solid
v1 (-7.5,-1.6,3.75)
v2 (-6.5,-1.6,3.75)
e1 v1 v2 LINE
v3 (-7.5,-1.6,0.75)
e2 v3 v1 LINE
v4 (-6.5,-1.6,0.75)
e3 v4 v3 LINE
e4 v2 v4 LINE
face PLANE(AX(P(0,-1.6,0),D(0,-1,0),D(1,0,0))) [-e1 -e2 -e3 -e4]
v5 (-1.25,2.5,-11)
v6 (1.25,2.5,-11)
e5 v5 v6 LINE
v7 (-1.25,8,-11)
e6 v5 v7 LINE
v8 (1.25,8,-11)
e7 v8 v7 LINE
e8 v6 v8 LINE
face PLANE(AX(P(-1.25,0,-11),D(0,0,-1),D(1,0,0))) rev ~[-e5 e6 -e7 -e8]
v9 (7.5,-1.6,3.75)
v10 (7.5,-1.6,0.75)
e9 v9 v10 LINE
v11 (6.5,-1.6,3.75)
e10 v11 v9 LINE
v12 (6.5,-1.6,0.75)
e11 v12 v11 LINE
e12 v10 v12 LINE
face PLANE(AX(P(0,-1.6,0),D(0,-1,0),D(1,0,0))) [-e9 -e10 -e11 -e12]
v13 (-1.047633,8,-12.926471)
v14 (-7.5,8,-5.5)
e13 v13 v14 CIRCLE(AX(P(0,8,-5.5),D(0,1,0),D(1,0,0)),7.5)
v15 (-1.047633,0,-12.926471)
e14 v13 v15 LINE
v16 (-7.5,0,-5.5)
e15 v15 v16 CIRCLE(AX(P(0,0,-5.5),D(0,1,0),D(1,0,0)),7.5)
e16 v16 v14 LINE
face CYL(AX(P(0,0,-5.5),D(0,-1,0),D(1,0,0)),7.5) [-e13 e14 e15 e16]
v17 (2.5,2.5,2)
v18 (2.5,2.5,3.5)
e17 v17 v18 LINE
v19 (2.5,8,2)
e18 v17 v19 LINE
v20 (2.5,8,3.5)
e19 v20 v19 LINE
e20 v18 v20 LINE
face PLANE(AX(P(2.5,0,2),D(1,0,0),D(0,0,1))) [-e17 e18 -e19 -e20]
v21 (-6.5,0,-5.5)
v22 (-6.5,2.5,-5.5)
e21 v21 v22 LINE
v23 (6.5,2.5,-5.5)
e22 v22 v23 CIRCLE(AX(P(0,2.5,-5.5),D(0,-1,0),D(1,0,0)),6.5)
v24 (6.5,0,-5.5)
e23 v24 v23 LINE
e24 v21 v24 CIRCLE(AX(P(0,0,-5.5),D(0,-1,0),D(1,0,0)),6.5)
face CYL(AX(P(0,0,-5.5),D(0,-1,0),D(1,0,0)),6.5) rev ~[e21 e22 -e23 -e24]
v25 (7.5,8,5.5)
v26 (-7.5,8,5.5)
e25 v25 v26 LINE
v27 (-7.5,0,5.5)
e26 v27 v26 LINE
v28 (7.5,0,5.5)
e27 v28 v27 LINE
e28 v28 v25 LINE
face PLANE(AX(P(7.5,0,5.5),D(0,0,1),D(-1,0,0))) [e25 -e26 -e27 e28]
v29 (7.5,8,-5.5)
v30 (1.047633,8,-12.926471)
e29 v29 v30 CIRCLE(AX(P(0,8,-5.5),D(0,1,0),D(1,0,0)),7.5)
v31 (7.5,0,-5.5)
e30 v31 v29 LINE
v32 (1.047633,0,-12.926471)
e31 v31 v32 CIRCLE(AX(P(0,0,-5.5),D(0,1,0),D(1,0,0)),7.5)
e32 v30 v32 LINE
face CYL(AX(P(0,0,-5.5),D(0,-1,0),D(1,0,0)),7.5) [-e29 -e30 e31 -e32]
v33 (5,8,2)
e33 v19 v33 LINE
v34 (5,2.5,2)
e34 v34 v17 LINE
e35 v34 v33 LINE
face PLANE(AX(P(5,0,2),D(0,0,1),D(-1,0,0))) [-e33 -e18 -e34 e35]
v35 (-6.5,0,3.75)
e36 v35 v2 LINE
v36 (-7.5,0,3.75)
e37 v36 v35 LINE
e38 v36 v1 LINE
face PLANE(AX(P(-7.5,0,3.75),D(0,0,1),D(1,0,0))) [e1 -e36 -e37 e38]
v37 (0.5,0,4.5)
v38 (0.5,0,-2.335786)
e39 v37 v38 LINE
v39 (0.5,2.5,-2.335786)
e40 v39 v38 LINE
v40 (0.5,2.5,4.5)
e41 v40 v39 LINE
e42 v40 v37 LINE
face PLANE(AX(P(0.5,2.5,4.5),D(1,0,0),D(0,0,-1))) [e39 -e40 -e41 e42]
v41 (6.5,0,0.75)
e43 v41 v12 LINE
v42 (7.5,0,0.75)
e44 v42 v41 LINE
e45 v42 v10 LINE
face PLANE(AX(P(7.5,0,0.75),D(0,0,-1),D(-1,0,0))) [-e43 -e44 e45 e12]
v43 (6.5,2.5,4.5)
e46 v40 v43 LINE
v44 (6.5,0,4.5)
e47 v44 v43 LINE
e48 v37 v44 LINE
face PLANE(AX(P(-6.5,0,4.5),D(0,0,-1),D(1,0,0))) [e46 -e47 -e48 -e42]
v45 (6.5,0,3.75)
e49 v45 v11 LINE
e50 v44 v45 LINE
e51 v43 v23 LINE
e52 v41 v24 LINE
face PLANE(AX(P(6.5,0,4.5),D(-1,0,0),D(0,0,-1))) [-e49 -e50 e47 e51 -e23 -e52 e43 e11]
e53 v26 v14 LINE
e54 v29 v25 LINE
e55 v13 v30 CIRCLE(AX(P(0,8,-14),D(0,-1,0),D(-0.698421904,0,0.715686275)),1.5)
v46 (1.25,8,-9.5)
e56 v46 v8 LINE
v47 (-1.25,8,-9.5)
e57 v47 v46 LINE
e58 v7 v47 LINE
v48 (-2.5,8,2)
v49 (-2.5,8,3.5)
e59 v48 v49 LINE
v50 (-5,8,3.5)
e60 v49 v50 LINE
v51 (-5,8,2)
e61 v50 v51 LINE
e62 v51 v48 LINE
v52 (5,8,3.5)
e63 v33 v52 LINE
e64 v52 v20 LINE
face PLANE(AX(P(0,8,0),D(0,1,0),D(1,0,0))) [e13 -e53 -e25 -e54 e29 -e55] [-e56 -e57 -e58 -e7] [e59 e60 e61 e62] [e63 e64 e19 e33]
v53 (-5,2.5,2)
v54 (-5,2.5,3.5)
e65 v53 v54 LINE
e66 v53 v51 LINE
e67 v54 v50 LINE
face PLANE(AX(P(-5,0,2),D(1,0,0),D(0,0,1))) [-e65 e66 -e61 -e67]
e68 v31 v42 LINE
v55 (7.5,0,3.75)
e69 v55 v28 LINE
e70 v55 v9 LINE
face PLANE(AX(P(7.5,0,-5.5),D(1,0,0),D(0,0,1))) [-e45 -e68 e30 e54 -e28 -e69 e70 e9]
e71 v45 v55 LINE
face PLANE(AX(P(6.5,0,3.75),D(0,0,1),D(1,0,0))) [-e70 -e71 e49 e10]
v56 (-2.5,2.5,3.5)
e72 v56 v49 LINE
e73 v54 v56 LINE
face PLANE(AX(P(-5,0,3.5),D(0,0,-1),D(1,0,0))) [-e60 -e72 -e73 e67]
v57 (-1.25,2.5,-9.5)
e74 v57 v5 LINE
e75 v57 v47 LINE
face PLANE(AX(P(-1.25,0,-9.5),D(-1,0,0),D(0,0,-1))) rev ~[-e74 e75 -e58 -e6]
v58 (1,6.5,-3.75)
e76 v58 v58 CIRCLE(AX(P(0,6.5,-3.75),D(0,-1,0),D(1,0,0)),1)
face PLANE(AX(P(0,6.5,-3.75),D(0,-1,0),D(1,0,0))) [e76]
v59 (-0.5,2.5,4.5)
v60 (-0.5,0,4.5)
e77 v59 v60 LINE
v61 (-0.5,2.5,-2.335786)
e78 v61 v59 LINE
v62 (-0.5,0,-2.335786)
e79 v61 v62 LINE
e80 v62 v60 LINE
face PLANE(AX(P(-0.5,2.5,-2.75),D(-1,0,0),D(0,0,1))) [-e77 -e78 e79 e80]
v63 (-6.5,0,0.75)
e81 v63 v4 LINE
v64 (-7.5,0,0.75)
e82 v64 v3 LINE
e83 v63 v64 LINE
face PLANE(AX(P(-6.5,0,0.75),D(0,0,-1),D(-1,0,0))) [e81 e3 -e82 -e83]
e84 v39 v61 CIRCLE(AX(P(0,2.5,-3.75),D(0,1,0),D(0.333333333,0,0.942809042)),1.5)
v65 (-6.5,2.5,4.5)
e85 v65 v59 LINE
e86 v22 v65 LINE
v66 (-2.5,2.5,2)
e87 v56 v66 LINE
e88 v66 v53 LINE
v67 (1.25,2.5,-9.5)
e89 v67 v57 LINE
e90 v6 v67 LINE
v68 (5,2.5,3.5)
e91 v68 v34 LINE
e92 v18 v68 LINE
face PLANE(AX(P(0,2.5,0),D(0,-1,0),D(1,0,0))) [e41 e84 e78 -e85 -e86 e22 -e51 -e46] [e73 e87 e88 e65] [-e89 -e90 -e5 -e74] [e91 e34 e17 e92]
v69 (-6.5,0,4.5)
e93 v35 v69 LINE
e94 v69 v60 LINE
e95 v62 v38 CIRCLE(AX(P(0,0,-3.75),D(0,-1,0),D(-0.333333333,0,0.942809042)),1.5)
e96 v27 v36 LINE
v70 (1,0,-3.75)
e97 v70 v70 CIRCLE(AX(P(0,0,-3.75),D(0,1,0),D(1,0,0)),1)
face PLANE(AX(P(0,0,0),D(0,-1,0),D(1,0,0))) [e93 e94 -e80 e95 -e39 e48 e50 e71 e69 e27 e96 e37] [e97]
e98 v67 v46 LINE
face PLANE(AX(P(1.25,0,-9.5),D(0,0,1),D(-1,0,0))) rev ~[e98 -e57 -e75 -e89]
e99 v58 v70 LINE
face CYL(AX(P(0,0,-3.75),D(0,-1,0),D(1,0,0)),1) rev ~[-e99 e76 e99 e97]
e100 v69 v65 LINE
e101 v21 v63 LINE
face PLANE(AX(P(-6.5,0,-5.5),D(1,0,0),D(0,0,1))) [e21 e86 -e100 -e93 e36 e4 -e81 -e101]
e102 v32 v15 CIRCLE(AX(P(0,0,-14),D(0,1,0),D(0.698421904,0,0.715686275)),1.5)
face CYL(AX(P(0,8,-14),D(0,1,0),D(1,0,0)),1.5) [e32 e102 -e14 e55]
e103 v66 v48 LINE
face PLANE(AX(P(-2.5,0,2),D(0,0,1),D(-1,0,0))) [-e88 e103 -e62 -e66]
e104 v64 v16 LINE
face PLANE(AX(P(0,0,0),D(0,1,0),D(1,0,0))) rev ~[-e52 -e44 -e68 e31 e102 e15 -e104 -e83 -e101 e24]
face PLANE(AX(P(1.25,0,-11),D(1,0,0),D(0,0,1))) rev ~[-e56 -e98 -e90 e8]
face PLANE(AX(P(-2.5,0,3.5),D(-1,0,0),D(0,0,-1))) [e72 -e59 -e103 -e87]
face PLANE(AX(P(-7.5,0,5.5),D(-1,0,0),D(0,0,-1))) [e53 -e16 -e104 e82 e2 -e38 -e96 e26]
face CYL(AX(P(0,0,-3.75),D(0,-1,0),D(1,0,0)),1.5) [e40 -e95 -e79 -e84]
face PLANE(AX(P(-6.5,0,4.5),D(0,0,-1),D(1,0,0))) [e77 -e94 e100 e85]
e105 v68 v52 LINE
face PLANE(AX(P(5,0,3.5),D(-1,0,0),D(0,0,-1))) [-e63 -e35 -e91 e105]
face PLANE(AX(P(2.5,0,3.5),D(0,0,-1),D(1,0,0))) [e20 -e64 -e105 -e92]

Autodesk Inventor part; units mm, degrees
ref_plane "YZ Plane" through (0, 0, 0) normal (1, 0, 0) x (0, 1, 0)
ref_plane "XZ Plane" through (0, 0, 0) normal (0, 1, 0) x (-1, 0, 0)
ref_plane "XY Plane" through (0, 0, 0) normal (0, 0, 1) x (1, 0, 0)
sketch "Sketch1" plane through (0, 0, 0) normal (0, 1, 0) x (-1, 0, 0)
  line L0 (-7.5, 5.5) -> (7.5, 5.5)
  line L1 (7.5, 5.5) -> (7.5, -5.5)
  line L2 (7.5, -5.5) -> (-7.5, -5.5)
  line L3 (-7.5, -5.5) -> (-7.5, 5.5)
  line L4 (-7.5, 5.5) -> (7.5, -5.5) construction
  line L5 (7.5, 5.5) -> (-7.5, -5.5) construction
  circle A0 centre (0, -5.5) radius 7.5 construction
  arc A1 (-7.5, -5.5) -> (7.5, -5.5) centre (0, -5.5) ccw
  point P0 (0, 0)
  dimension "d0" = 11
  dimension "d1" = 15
extrude "Extrusion1" add sketch "Sketch1" along normal blind 8
sketch "Sketch2" plane through (0, 0, 0) normal (0, -1, 0) x (1, 0, 0)
  line L0 (7.5, 9.25) -> (-7.5, 9.25)
  line L1 (-7.5, 9.25) -> (-7.5, -20.75)
  line L2 (-7.5, -20.75) -> (7.5, -20.75)
  line L3 (7.5, -20.75) -> (7.5, 9.25)
  line L4 (7.5, 9.25) -> (-7.5, -20.75) construction
  line L5 (-7.5, 9.25) -> (7.5, -20.75) construction
  line L6 (-7.5, 5.5) -> (7.5, 5.5) projected
  line L7 (7, 8.75) -> (-7, 8.75) construction
  line L8 (-7, 8.75) -> (-7, -20.25) construction
  line L9 (-7, -20.25) -> (7, -20.25) construction
  line L10 (7, -20.25) -> (7, 8.75) construction
  line L11 (7, 8.75) -> (-7, -20.25) construction
  line L12 (-7, 8.75) -> (7, -20.25) construction
  point P0 (0, 0)
  point P1 (0, -5.75)
  dimension "d4" = 15
  dimension "d5" = 30
  dimension "d6" = 3.75
  dimension "d18" = 0.5
  dimension "d19" = 0.5
sketch "Sketch4" plane through (0, 0, 0) normal (0, -1, 0) x (1, 0, 0)
  line L0 (-7.5, -5.5) -> (-7.5, 5.5) projected
  line L1 (-7.5, 3.75) -> (-6.5, 3.75)
  line L2 (-6.5, 3.75) -> (-6.5, 0.75)
  line L3 (-6.5, 0.75) -> (-7.5, 0.75)
  line L4 (-7.5, 0.75) -> (-7.5, 3.75)
  line L5 (7.5, 5.5) -> (7.5, -5.5) projected
  line L6 (7.5, 0.75) -> (6.5, 0.75)
  line L7 (6.5, 0.75) -> (6.5, 3.75)
  line L8 (6.5, 3.75) -> (7.5, 3.75)
  line L9 (7.5, 3.75) -> (7.5, 0.75)
  line L10 (-7.5, -20.25) -> (7.5, -20.25) construction
  line L11 (7.5, -20.25) -> (7.5, 9.75) construction
  line L12 (7.5, 9.75) -> (-7.5, 9.75) construction
  line L13 (-7.5, 9.75) -> (-7.5, -20.25) construction
  line L14 (-7.5, -20.25) -> (7.5, 9.75) construction
  line L15 (7.5, -20.25) -> (-7.5, 9.75) construction
  line L16 (-7.5, 5.5) -> (7.5, 5.5) construction
  arc A0 (-7.5, -5.5) -> (7.5, -5.5) centre (0, -5.5) ccw construction
  point P0 (0, 0)
  point P1 (0, -5.25)
  point P2 (0, -13)
  point P3 (-7, 3.75)
  point P4 (-7.5, 0.75)
  point P5 (-7, 0.75)
  point P6 (7.5, 3.75)
  point P7 (-7.5, 0.75)
  dimension "d20" = 1
  dimension "d21" = 3
  dimension "d22" = 1
  dimension "d23" = 3
  dimension "d24" = 15
  dimension "d25" = 30
  dimension "d27" = 7.25
  dimension "d106" = 0.75
extrude "Extrusion3" add sketch "Sketch4" along normal blind 1.6
sketch "Sketch6" plane through (0, 0, 0) normal (0, -1, 0) x (1, 0, 0)
  line L0 (7.5, 11.25) -> (-7.5, 11.25)
  line L1 (-7.5, 11.25) -> (-7.5, -18.75)
  line L2 (-7.5, -18.75) -> (7.5, -18.75)
  line L3 (7.5, -18.75) -> (7.5, 11.25)
  line L4 (7.5, 11.25) -> (-7.5, -18.75) construction
  line L5 (-7.5, 11.25) -> (7.5, -18.75) construction
  line L6 (7, 10.75) -> (-7, 10.75) construction
  line L7 (-7, 10.75) -> (-7, -18.25) construction
  line L8 (-7, -18.25) -> (7, -18.25) construction
  line L9 (7, -18.25) -> (7, 10.75) construction
  line L10 (7, 10.75) -> (-7, -18.25) construction
  line L11 (-7, 10.75) -> (7, -18.25) construction
  circle A0 centre (0, -3.75) radius 1
  circle A1 centre (0, -3.75) radius 1.5
  line L12 (-6.5, 4.5) -> (6.5, 4.5)
  line L13 (6.5, 4.5) -> (6.5, -5.5)
  line L14 (6.5, -5.5) -> (-6.5, -5.5)
  line L15 (-6.5, -5.5) -> (-6.5, 4.5)
  line L16 (-7.5, 5.5) -> (7.5, 5.5) projected
  arc A2 (-7.5, -5.5) -> (7.5, -5.5) centre (0, -5.5) ccw projected
  circle A3 centre (0, -5.5) radius 6.5
  point P0 (0, 0)
  point P1 (-7.5, -3.75)
  point P2 (6.5, -5.5)
  dimension "d31" = 15
  dimension "d32" = 30
  dimension "d34" = 0.5
  dimension "d35" = 0.5
  dimension "d36" = 2
  dimension "d37" = 0.5
  dimension "d38" = 1
  dimension "d39" = 1
  dimension "d40" = 1
  dimension "d41" = 1
  dimension "d107" = 3.75
extrude "Extrusion4" cut sketch "Sketch6" against normal blind 2.5 contours A0 | L12 L13 A3 L15 | A3 L14 | L14 A3
sketch "Sketch10" plane through (0, 8, 0) normal (0, 1, 0) x (1, 0, 0)
  point P0 (0, 0)
sketch "Sketch11" plane through (0, 0, 0) normal (0, -1, 0) x (1, 0, 0)
  line L0 (-5, 3.5) -> (-2.5, 3.5)
  line L1 (-2.5, 3.5) -> (-2.5, 2)
  line L2 (-2.5, 2) -> (-5, 2)
  line L3 (-5, 2) -> (-5, 3.5)
  line L4 (2.5, 3.5) -> (5, 3.5)
  line L5 (5, 3.5) -> (5, 2)
  line L6 (5, 2) -> (2.5, 2)
  line L7 (2.5, 2) -> (2.5, 3.5)
  line L8 (-6.5, 3.75) -> (-7.5, 3.75) projected
  line L9 (-6.5, 0.75) -> (-6.5, 3.75) projected
  line L10 (6.5, 3.75) -> (6.5, 0.75) projected
  line L11 (-6.5, 4.5) -> (6.5, 4.5) projected
  line L12 (-1.25, -11) -> (1.25, -11)
  line L13 (1.25, -11) -> (1.25, -9.5)
  line L14 (1.25, -9.5) -> (-1.25, -9.5)
  line L15 (-1.25, -9.5) -> (-1.25, -11)
  circle A0 centre (0, -3.75) radius 1 projected
  point P0 (0, 0)
  point P1 (-3.75, 3.5)
  point P2 (3.75, 3.5)
  point P3 (1.25, -10.25)
  point P4 (2.5, 2.75)
  point P5 (0, -9.5)
  point P6 (3.75, 2)
  point P7 (-2.5, 2.75)
  dimension "d51" = 2.5
  dimension "d52" = 1.5
  dimension "d55" = 2.75
  dimension "d56" = 2.75
  dimension "d60" = 13
  dimension "d61" = 3.75
  dimension "d62" = 3.75
  dimension "d103" = 6.5
  dimension "d104" = 6.5
extrude "Extrusion8" cut sketch "Sketch11" against normal blind 10 contours L0 L1 L2 L3 | L4 L5 L6 L7 | L15 L14 L13 L12
sketch "Sketch12" plane through (0, 2.5, 0) normal (0, -1, 0) x (1, 0, 0)
  line L0 (5, 2) -> (5, 3.5) construction
  line L1 (2.5, 2) -> (5, 2) construction
  line L2 (5, 3.5) -> (2.5, 3.5) construction
  line L3 (2.5, 3.5) -> (2.5, 2) construction
  line L4 (2.5, 2) -> (5, 2) construction
  line L5 (5, 2) -> (5, 3.5) construction
  line L6 (-2.5, 2) -> (-2.5, 3.5) construction
  line L7 (-2.5, 2) -> (-5, 2) construction
  line L8 (-2.5, 3.5) -> (-5, 3.5) construction
  line L9 (-5, 3.5) -> (-5, 2) construction
  line L10 (-5, 2) -> (-2.5, 2) construction
  line L11 (-2.5, 2) -> (-2.5, 3.5) construction
  line L12 (-1.25, -9.5) -> (1.25, -9.5) construction
  line L13 (-1.25, -9.5) -> (-1.25, -11) construction
  line L14 (1.25, -9.5) -> (-1.25, -9.5) construction
  line L15 (-1.25, -9.5) -> (-1.25, -11) construction
  line L16 (-1.25, -11) -> (1.25, -11) construction
  line L17 (1.25, -11) -> (1.25, -9.5) construction
  line L18 (5.5, 3.5) -> (2, 3.5)
  line L19 (2, 3.5) -> (2, 2)
  line L20 (2, 2) -> (5.5, 2)
  line L21 (5.5, 2) -> (5.5, 3.5)
  line L22 (1.75, -9.5) -> (-1.75, -9.5)
  line L23 (-1.75, -9.5) -> (-1.75, -11)
  line L24 (-1.75, -11) -> (1.75, -11)
  line L25 (1.75, -11) -> (1.75, -9.5)
  line L26 (-2, 3.5) -> (-5.5, 3.5)
  line L27 (-5.5, 3.5) -> (-5.5, 2)
  line L28 (-5.5, 2) -> (-2, 2)
  line L29 (-2, 2) -> (-2, 3.5)
  point P0 (0, 0)
  point P1 (-2.5, 2.75)
  point P2 (-2, 2.75)
  point P3 (-3.75, 2)
  point P4 (-3.75, 2)
  point P5 (-3.75, 3.5)
  point P6 (-3.75, 3.5)
  point P7 (-5, 2.75)
  point P8 (-5.5, 2.75)
  point P9 (1.25, -10.25)
  point P10 (1.75, -10.25)
  point P11 (0, -11)
  point P12 (-1.25, -10.25)
  dimension "d63" = 0.5
  dimension "d64" = 0
  dimension "d65" = 0
  dimension "d67" = 0.5
  dimension "d68" = 0
  dimension "d69" = 0
  dimension "d70" = 0.5
  dimension "d71" = 0.5
  dimension "d72" = 0
  dimension "d73" = 0
  dimension "d74" = 0.5
  dimension "d96" = 0.5
sketch "Sketch16" plane through (0, 2.5, 0) normal (0, -1, 0) x (1, 0, 0)
  line L0 (-6.5, -5.5) -> (-6.5, 4.5) construction
  line L1 (-6.5, 4.5) -> (6.5, 4.5) construction
  line L2 (-6.5, 4.5) -> (6.5, 4.5) construction
  line L3 (-0.5, 4.5) -> (0.5, 4.5)
  line L4 (0.5, 4.5) -> (0.5, -2.75)
  line L5 (0.5, -2.75) -> (-0.5, -2.75)
  line L6 (-0.5, -2.75) -> (-0.5, 4.5)
  circle A0 centre (0, -3.75) radius 1.5 construction
  circle A1 centre (0, -3.75) radius 1.75 construction
  line L7 (-6.5, -2.75) -> (6.5174, -2.75) construction
  circle A2 centre (0, -3.75) radius 1.5 construction
  circle A3 centre (0, -3.75) radius 1 construction
  line L8 (6.5, 0.75) -> (6.5, -5.5) projected
  line L9 (-6.5, -5.873) -> (6.5, -5.873)
  line L10 (6.5, -5.873) -> (6.5, -6.873)
  line L11 (6.5, -6.873) -> (-6.5, -6.873)
  line L12 (-6.5, -6.873) -> (-6.5, -5.873)
  point P0 (0, 0)
  point P1 (0, 4.5)
  point P2 (0.0087, -2.75)
  dimension "d94" = 1
  dimension "d95" = 1
extrude "Extrusion10" add sketch "Sketch16" along normal blind 2.5 contours L3 L4 L5 L6
sketch "Sketch18" plane through (0, 8, 0) normal (0, 1, 0) x (1, 0, 0)
  line L0 (0, 0) -> (0, 18.6084) construction
  circle A0 centre (0, 14) radius 1.5
  line L1 (-1.25, 11) -> (1.25, 11) projected
  dimension "d108" = 3
  dimension "d109" = 3
extrude "Extrusion12" add sketch "Sketch18" against normal blind 8
sketch "Sketch19" plane through (0, 2.5, -3.75) normal (0, -1, 0) x (1, 0, 0)
  circle A0 centre (0, 0) radius 1 projected
  circle A1 centre (0, 0) radius 1
  point P0 (0, 3.75)
extrude "Extrusion13" cut sketch "Sketch19" against normal blind 4
sketch "Sketch14" plane through (0, 2.5, 0) normal (0, -1, 0) x (1, 0, 0)
  line L0 (5, 2.75) -> (2.5, 2.75) construction
  line L1 (2.5, 2.75) -> (2.5, 1.25) construction
  line L2 (2.5, 1.25) -> (5, 1.25) construction
  line L3 (5, 1.25) -> (5, 2.75) construction
  line L4 (5.5, 3.25) -> (2, 3.25)
  line L5 (2, 3.25) -> (2, 0.75)
  line L6 (2, 0.75) -> (5.5, 0.75)
  line L7 (5.5, 0.75) -> (5.5, 3.25)
  dimension "d86" = 0.5
  dimension "d87" = 0.5
sketch "Sketch15" plane through (0, 3.5, 0) normal (0, -1, 0) x (1, 0, 0)
  line L0 (5, 2.75) -> (2.5, 2.75)
  line L1 (2.5, 2.75) -> (2.5, 1.25)
  line L2 (2.5, 1.25) -> (5, 1.25)
  line L3 (5, 1.25) -> (5, 2.75)
  point P0 (0, 0)
sketch "Sketch8" plane through (0, 0, -3.75) normal (0, -1, 0) x (1, 0, 0)
  circle A0 centre (0, 0) radius 1.75
  circle A1 centre (0, 0) radius 1.5 projected
  circle A2 centre (0, 0) radius 1.5
  point P0 (0, 3.75)
  dimension "d46" = 0.25
sketch "Sketch7" plane through (0, 2.5, -3.75) normal (0, -1, 0) x (1, 0, 0)
  circle A0 centre (0, 0) radius 1.25
  point P0 (0, 3.75)
properties part number "NANDGATE"
